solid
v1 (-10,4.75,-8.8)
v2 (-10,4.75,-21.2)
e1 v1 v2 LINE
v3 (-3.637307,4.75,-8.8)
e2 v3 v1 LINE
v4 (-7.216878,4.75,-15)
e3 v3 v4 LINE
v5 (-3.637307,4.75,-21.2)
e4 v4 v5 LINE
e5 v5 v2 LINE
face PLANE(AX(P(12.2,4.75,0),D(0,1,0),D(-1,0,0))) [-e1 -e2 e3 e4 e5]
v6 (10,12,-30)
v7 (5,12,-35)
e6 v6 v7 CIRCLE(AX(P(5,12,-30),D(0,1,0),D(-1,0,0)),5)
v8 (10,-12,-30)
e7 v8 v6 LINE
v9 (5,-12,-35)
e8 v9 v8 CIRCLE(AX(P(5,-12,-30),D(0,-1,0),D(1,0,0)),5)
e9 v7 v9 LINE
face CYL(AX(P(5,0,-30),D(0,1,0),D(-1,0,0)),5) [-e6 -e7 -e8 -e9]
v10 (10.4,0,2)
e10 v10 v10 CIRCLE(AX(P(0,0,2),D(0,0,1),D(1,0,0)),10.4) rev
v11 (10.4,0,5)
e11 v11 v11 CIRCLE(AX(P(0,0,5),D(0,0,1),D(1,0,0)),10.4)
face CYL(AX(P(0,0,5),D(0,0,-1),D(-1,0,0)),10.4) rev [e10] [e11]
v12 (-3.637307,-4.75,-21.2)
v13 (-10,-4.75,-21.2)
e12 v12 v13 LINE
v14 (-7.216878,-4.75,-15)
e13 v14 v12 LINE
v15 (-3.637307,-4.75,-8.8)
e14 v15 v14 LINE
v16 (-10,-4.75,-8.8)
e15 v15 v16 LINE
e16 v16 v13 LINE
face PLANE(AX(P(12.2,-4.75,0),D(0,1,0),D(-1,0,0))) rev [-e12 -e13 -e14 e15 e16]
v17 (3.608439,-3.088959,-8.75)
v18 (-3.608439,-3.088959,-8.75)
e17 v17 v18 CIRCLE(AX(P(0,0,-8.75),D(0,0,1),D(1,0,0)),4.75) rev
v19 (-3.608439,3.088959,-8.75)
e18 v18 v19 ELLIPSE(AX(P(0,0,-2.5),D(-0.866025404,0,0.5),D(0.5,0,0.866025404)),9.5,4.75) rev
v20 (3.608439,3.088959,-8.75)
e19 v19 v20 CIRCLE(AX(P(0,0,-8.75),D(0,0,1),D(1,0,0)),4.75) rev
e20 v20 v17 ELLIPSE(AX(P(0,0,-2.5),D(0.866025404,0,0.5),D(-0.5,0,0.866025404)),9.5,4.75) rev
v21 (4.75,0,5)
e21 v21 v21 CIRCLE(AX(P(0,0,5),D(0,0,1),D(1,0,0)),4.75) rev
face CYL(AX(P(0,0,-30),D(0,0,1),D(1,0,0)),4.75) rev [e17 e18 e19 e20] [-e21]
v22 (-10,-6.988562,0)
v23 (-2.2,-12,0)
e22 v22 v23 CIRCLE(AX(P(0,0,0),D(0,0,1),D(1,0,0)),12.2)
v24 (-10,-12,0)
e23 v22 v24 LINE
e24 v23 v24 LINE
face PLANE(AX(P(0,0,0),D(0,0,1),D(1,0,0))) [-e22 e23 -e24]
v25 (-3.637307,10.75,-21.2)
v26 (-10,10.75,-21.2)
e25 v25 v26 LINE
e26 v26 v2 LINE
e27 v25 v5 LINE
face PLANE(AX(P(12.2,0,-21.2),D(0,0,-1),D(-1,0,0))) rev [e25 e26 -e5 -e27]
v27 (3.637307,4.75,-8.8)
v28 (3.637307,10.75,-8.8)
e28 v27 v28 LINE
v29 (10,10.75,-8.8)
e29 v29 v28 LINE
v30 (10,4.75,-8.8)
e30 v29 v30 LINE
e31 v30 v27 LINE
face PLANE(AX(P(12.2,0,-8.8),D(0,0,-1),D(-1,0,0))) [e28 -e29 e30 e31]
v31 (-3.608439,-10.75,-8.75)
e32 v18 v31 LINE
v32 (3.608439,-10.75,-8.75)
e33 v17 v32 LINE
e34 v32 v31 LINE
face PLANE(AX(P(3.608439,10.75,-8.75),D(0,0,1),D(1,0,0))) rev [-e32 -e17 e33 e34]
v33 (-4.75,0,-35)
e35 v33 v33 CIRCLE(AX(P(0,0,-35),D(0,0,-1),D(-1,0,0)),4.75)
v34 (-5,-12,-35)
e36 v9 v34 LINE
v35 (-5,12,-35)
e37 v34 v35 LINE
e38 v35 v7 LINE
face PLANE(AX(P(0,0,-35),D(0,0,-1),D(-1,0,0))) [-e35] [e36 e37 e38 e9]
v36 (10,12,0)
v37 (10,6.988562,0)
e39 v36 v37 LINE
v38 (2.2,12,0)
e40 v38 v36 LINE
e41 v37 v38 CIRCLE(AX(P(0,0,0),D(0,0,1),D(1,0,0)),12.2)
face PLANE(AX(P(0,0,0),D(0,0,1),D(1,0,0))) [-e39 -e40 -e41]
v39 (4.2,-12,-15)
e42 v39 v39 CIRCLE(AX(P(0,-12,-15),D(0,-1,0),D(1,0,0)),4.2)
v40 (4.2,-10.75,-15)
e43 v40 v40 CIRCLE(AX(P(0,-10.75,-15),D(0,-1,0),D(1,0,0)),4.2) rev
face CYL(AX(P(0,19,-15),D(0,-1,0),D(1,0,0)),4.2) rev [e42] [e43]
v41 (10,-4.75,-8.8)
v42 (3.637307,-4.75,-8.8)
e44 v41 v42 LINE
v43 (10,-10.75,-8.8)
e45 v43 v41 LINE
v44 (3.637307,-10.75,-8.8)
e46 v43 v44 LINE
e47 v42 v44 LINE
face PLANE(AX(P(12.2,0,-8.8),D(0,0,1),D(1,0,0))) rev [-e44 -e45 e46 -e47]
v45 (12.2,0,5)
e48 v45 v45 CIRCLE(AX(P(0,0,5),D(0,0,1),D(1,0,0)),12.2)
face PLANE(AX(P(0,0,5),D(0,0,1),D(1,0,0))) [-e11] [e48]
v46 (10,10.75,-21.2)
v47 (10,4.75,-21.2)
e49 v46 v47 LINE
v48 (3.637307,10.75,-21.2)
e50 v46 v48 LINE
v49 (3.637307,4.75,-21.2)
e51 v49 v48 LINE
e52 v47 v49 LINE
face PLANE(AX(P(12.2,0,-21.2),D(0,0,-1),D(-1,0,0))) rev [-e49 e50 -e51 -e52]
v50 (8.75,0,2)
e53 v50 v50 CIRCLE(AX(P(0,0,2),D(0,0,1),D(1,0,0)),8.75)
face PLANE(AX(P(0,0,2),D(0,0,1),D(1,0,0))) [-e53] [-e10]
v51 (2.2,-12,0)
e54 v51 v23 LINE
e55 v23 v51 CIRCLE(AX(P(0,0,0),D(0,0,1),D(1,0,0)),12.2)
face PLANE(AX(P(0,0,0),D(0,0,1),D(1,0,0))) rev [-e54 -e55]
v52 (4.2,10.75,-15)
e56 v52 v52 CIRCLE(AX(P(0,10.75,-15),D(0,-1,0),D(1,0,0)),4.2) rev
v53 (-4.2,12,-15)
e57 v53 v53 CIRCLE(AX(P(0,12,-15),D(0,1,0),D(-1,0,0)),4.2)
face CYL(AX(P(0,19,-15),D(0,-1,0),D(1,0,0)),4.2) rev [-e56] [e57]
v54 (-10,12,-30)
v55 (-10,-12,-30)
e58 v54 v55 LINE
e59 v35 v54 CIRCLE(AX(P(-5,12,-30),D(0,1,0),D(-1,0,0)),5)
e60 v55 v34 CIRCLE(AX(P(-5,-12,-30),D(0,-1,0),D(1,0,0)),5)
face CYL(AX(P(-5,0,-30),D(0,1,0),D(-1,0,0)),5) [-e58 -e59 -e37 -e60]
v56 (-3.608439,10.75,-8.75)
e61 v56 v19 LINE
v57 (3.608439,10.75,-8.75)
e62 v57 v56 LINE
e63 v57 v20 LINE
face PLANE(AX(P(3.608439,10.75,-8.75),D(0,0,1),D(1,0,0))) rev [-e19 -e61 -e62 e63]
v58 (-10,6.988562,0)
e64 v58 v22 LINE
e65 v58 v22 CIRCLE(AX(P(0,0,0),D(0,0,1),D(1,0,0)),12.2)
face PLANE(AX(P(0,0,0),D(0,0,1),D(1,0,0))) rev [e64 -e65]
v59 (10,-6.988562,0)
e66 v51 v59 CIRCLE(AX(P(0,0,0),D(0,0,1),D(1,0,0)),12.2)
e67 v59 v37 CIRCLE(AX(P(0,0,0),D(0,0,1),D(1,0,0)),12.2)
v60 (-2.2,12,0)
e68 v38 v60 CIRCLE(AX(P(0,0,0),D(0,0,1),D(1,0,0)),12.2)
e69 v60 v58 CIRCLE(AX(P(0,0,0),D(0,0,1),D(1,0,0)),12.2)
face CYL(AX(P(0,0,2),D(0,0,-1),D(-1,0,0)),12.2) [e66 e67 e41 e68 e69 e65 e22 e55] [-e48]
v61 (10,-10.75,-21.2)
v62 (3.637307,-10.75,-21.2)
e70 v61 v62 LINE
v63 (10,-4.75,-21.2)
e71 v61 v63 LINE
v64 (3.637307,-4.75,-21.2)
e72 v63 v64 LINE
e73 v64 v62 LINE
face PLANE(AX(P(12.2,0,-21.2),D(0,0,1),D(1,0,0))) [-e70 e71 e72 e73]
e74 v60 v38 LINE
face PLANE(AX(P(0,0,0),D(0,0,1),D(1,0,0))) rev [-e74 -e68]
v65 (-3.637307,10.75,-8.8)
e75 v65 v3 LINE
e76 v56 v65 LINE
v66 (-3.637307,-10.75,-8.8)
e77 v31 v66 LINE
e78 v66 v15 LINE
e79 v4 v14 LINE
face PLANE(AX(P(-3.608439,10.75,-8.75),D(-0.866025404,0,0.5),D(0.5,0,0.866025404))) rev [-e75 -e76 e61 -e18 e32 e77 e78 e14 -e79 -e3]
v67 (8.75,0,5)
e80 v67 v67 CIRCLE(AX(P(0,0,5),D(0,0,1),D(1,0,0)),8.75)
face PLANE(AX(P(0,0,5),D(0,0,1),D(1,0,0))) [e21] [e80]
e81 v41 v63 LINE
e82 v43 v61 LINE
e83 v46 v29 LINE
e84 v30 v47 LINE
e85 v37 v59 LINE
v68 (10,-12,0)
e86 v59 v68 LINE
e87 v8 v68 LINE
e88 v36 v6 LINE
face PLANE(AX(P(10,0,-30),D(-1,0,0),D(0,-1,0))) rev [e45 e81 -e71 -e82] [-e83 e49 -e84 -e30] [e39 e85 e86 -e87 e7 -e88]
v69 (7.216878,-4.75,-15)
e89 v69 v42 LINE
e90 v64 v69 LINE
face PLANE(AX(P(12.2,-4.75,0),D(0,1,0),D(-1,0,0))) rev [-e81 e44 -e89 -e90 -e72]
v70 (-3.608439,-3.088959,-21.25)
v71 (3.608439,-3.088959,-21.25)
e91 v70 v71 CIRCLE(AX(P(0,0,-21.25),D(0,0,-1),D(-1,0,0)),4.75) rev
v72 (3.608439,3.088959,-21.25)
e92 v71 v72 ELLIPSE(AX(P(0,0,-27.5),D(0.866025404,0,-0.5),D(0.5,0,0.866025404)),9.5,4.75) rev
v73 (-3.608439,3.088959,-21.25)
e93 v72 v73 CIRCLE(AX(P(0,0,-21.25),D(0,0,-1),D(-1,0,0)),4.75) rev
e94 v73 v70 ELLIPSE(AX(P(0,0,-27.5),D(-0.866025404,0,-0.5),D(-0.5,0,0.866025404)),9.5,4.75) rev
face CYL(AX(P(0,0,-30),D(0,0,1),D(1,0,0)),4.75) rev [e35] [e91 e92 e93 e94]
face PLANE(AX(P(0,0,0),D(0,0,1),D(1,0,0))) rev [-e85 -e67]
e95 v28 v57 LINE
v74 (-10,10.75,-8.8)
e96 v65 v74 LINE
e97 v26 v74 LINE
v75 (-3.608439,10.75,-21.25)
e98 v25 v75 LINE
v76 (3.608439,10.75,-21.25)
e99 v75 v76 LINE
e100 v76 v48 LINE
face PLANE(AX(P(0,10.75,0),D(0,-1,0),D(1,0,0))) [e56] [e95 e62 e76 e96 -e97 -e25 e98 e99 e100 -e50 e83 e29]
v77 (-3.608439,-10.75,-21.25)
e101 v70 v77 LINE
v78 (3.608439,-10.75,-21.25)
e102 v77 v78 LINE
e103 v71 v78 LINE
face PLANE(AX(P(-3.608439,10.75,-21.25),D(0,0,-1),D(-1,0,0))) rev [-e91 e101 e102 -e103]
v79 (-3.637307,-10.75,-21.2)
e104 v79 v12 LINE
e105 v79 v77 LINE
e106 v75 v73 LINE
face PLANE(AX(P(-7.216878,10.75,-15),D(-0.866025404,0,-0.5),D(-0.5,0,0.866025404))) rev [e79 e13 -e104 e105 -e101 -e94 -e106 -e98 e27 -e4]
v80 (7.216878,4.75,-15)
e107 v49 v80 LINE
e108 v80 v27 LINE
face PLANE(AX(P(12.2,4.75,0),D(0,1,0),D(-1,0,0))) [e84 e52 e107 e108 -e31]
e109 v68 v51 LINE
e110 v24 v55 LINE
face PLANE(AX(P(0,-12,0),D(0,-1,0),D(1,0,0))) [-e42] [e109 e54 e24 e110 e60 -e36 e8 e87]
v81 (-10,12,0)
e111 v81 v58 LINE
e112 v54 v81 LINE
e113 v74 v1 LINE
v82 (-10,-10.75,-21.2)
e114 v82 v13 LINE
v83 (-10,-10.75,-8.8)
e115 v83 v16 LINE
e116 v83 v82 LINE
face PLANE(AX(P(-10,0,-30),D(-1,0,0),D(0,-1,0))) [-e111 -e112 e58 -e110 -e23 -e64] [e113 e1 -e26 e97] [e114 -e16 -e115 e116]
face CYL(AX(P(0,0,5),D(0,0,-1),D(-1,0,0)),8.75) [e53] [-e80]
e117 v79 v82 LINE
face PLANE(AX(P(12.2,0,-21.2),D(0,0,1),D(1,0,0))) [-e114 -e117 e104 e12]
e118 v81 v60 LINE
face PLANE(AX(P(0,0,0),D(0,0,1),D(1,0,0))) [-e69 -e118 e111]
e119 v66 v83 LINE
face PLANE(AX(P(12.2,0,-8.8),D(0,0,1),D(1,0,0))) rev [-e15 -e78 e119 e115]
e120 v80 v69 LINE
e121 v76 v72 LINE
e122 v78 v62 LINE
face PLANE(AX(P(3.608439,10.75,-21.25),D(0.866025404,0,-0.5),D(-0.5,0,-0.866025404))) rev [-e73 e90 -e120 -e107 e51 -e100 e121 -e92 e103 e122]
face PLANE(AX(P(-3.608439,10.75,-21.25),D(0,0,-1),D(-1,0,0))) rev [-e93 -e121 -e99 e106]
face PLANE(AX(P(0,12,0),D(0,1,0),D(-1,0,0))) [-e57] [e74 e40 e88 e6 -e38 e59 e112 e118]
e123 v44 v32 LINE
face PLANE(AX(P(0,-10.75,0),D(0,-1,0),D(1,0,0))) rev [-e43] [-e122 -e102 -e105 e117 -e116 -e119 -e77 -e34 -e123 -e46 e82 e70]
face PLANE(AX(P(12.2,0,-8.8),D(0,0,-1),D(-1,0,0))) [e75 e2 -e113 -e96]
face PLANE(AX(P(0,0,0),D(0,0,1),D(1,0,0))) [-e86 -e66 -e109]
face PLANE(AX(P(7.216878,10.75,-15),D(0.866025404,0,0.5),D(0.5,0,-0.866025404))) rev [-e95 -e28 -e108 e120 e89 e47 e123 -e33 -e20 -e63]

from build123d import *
from build123d.topology import SkipClean

# Parameters (mm, degrees)
SKETCH4_W                = 20
SKETCH4_H                = 22
SKETCH4_R                = 4.75
BOSS_EXTRUDE2_DEPTH      = 30
CUT_EXTRUDE1_DEPTH       = 30
BOSS_EXTRUDE3_START      = 1
SKETCH11_W               = 20
SKETCH11_H               = 30
SKETCH11_R               = 4.2
BOSS_EXTRUDE3_DEPTH      = 1
SKETCH12_W               = 20
SKETCH12_H               = 30
SKETCH12_R               = 4.2
BOSS_EXTRUDE4_DEPTH      = 1
CUT_EXTRUDE2_DEPTH       = 10.75
SKETCH16_R               = 12.2
BOSS_EXTRUDE7_DEPTH      = 2
CUT_EXTRUDE3_START       = -2
SKETCH18_R               = 4.75
CUT_EXTRUDE3_DEPTH       = 2
BOSS_EXTRUDE8_START      = 3
SKETCH19_R               = 12.2
SKETCH19_R_2             = 10.4
SKETCH19_R_3             = 8.75
SKETCH19_R_4             = 4.75
BOSS_EXTRUDE8_DEPTH      = 3
SKETCH21_W               = 20
SKETCH21_H               = 24
SKETCH21_R               = 4.75
BOSS_EXTRUDE9_DEPTH      = 5
FILLET1_R                = 5
CUT_EXTRUDE12_DEPTH      = 44.205092
CUT_EXTRUDE12_DEPTH_BACK = 44.205092


with BuildPart() as part:
    # Sketch4 → Boss-Extrude2 (new body)
    with BuildSketch(Plane.XY):
        Rectangle(SKETCH4_W, SKETCH4_H)
        Circle(SKETCH4_R, mode=Mode.SUBTRACT)
    extrude(amount=-BOSS_EXTRUDE2_DEPTH)

    # Sketch7 → Cut-Extrude1 (cut)
    with BuildSketch(Plane.XZ.offset(11)):
        with BuildLine():
            ThreePointArc((4.2, -15), (2.969848, -12.030152), (0, -10.8))
            Line((0, -10.8), (0, -19.2))
            ThreePointArc((0, -19.2), (2.969848, -17.969848), (4.2, -15))
        make_face()
        with BuildLine():
            Line((0, -19.2), (0, -10.8))
            ThreePointArc((0, -10.8), (-4.2, -15), (0, -19.2))
        make_face()
    extrude(amount=-CUT_EXTRUDE1_DEPTH, mode=Mode.SUBTRACT)

    # Sketch11 → Boss-Extrude3 (add)
    with BuildSketch(Plane.XZ.offset(11).offset(BOSS_EXTRUDE3_START)):
        with Locations((0, -15)):
            Rectangle(SKETCH11_W, SKETCH11_H)
        with Locations((0, -15)):
            Circle(SKETCH11_R, mode=Mode.SUBTRACT)
    extrude(amount=-BOSS_EXTRUDE3_DEPTH)

    # Sketch12 → Boss-Extrude4 (add)
    with SkipClean():  # the faces are left unmerged after this step: merging them gives an invalid solid
        with BuildSketch(Plane(origin=(0, 11, 0), x_dir=(1, 0, 0), z_dir=(0, 1, 0))):
            with Locations((0, 15)):
                Rectangle(SKETCH12_W, SKETCH12_H)
            with Locations((0, 15)):
                Circle(SKETCH12_R, mode=Mode.SUBTRACT)
        extrude(amount=BOSS_EXTRUDE4_DEPTH)

    # Sketch9 → Cut-Extrude2 (cut, symmetric)
    with SkipClean():  # the faces are left unmerged after this step: merging them gives an invalid solid
        with BuildSketch(Plane(origin=(0, 0, 0), x_dir=(-1, 0, 0), z_dir=(0, -1, 0))):
            Polygon((7.216878, 15), (3.608439, 21.25), (-3.608439, 21.25), (-7.216878, 15), (-3.608439, 8.75), (3.608439, 8.75), align=None)
        extrude(amount=CUT_EXTRUDE2_DEPTH, both=True, mode=Mode.SUBTRACT)

    # Sketch16 → Boss-Extrude7 (add)
    with SkipClean():  # the faces are left unmerged after this step: merging them gives an invalid solid
        with BuildSketch(Plane.XY):
            with Locations(Location((0, 0, 0), (0, 0, 145.051986))):
                Circle(SKETCH16_R)
        extrude(amount=BOSS_EXTRUDE7_DEPTH)

    # Sketch18 → Cut-Extrude3 (cut)
    with SkipClean():  # the faces are left unmerged after this step: merging them gives an invalid solid
        with BuildSketch(Plane(origin=(0, 0, 0), x_dir=(-1, 0, 0), z_dir=(0, 0, -1)).offset(CUT_EXTRUDE3_START)):
            with Locations(Location((0, 0, 0), (0, 0, 139.435238))):
                Circle(SKETCH18_R)
        extrude(amount=CUT_EXTRUDE3_DEPTH, mode=Mode.SUBTRACT)

    # Sketch19 → Boss-Extrude8 (add)
    # profile 1 of 2: a face of its own
    with SkipClean():  # the faces are left unmerged after this step: merging them gives an invalid solid
        with BuildSketch(Plane.XY.offset(2).offset(BOSS_EXTRUDE8_START)):
            with Locations(Location((0, 0, 0), (0, 0, 145.051986))):
                Circle(SKETCH19_R)
            Circle(SKETCH19_R_2, mode=Mode.SUBTRACT)
        # profile 2 of 2: a face of its own
        with BuildSketch(Plane.XY.offset(2).offset(BOSS_EXTRUDE8_START)):
            Circle(SKETCH19_R_3)
            Circle(SKETCH19_R_4, mode=Mode.SUBTRACT)
        extrude(amount=-BOSS_EXTRUDE8_DEPTH)

    # Sketch21 → Boss-Extrude9 (add)
    with SkipClean():  # the faces are left unmerged after this step: merging them gives an invalid solid
        with BuildSketch(Plane(origin=(0, 0, -30), x_dir=(-1, 0, 0), z_dir=(0, 0, -1))):
            Rectangle(SKETCH21_W, SKETCH21_H)
            with Locations(Location((0, 0, 0), (0, 0, 180))):
                Circle(SKETCH21_R, mode=Mode.SUBTRACT)
        extrude(amount=BOSS_EXTRUDE9_DEPTH)

    # Fillet1
    fillet1_edges = [part.edges().sort_by_distance(p)[0] for p in [
        (10, 0, -35),
        (-10, 0, -35),
    ]]
    fillet(fillet1_edges, radius=FILLET1_R - 0.0001)  # a hair under: the kernel refuses the full size

    # Sketch27 → Cut-Extrude12 (cut, two sides: drawn at the far end of the back side and taken through both)
    with BuildSketch(Plane.ZY.offset(10).offset(-CUT_EXTRUDE12_DEPTH_BACK)):
        Polygon((-15, 10.75), (-8.8, 10.75), (-8.8, 4.75), (-21.2, 4.75), (-21.2, 10.75), align=None)
        Polygon((-21.2, -10.75), (-21.2, -4.75), (-8.8, -4.75), (-8.8, -10.75), (-15, -10.75), align=None)
    extrude(amount=CUT_EXTRUDE12_DEPTH + CUT_EXTRUDE12_DEPTH_BACK, mode=Mode.SUBTRACT)


solid = part.part
